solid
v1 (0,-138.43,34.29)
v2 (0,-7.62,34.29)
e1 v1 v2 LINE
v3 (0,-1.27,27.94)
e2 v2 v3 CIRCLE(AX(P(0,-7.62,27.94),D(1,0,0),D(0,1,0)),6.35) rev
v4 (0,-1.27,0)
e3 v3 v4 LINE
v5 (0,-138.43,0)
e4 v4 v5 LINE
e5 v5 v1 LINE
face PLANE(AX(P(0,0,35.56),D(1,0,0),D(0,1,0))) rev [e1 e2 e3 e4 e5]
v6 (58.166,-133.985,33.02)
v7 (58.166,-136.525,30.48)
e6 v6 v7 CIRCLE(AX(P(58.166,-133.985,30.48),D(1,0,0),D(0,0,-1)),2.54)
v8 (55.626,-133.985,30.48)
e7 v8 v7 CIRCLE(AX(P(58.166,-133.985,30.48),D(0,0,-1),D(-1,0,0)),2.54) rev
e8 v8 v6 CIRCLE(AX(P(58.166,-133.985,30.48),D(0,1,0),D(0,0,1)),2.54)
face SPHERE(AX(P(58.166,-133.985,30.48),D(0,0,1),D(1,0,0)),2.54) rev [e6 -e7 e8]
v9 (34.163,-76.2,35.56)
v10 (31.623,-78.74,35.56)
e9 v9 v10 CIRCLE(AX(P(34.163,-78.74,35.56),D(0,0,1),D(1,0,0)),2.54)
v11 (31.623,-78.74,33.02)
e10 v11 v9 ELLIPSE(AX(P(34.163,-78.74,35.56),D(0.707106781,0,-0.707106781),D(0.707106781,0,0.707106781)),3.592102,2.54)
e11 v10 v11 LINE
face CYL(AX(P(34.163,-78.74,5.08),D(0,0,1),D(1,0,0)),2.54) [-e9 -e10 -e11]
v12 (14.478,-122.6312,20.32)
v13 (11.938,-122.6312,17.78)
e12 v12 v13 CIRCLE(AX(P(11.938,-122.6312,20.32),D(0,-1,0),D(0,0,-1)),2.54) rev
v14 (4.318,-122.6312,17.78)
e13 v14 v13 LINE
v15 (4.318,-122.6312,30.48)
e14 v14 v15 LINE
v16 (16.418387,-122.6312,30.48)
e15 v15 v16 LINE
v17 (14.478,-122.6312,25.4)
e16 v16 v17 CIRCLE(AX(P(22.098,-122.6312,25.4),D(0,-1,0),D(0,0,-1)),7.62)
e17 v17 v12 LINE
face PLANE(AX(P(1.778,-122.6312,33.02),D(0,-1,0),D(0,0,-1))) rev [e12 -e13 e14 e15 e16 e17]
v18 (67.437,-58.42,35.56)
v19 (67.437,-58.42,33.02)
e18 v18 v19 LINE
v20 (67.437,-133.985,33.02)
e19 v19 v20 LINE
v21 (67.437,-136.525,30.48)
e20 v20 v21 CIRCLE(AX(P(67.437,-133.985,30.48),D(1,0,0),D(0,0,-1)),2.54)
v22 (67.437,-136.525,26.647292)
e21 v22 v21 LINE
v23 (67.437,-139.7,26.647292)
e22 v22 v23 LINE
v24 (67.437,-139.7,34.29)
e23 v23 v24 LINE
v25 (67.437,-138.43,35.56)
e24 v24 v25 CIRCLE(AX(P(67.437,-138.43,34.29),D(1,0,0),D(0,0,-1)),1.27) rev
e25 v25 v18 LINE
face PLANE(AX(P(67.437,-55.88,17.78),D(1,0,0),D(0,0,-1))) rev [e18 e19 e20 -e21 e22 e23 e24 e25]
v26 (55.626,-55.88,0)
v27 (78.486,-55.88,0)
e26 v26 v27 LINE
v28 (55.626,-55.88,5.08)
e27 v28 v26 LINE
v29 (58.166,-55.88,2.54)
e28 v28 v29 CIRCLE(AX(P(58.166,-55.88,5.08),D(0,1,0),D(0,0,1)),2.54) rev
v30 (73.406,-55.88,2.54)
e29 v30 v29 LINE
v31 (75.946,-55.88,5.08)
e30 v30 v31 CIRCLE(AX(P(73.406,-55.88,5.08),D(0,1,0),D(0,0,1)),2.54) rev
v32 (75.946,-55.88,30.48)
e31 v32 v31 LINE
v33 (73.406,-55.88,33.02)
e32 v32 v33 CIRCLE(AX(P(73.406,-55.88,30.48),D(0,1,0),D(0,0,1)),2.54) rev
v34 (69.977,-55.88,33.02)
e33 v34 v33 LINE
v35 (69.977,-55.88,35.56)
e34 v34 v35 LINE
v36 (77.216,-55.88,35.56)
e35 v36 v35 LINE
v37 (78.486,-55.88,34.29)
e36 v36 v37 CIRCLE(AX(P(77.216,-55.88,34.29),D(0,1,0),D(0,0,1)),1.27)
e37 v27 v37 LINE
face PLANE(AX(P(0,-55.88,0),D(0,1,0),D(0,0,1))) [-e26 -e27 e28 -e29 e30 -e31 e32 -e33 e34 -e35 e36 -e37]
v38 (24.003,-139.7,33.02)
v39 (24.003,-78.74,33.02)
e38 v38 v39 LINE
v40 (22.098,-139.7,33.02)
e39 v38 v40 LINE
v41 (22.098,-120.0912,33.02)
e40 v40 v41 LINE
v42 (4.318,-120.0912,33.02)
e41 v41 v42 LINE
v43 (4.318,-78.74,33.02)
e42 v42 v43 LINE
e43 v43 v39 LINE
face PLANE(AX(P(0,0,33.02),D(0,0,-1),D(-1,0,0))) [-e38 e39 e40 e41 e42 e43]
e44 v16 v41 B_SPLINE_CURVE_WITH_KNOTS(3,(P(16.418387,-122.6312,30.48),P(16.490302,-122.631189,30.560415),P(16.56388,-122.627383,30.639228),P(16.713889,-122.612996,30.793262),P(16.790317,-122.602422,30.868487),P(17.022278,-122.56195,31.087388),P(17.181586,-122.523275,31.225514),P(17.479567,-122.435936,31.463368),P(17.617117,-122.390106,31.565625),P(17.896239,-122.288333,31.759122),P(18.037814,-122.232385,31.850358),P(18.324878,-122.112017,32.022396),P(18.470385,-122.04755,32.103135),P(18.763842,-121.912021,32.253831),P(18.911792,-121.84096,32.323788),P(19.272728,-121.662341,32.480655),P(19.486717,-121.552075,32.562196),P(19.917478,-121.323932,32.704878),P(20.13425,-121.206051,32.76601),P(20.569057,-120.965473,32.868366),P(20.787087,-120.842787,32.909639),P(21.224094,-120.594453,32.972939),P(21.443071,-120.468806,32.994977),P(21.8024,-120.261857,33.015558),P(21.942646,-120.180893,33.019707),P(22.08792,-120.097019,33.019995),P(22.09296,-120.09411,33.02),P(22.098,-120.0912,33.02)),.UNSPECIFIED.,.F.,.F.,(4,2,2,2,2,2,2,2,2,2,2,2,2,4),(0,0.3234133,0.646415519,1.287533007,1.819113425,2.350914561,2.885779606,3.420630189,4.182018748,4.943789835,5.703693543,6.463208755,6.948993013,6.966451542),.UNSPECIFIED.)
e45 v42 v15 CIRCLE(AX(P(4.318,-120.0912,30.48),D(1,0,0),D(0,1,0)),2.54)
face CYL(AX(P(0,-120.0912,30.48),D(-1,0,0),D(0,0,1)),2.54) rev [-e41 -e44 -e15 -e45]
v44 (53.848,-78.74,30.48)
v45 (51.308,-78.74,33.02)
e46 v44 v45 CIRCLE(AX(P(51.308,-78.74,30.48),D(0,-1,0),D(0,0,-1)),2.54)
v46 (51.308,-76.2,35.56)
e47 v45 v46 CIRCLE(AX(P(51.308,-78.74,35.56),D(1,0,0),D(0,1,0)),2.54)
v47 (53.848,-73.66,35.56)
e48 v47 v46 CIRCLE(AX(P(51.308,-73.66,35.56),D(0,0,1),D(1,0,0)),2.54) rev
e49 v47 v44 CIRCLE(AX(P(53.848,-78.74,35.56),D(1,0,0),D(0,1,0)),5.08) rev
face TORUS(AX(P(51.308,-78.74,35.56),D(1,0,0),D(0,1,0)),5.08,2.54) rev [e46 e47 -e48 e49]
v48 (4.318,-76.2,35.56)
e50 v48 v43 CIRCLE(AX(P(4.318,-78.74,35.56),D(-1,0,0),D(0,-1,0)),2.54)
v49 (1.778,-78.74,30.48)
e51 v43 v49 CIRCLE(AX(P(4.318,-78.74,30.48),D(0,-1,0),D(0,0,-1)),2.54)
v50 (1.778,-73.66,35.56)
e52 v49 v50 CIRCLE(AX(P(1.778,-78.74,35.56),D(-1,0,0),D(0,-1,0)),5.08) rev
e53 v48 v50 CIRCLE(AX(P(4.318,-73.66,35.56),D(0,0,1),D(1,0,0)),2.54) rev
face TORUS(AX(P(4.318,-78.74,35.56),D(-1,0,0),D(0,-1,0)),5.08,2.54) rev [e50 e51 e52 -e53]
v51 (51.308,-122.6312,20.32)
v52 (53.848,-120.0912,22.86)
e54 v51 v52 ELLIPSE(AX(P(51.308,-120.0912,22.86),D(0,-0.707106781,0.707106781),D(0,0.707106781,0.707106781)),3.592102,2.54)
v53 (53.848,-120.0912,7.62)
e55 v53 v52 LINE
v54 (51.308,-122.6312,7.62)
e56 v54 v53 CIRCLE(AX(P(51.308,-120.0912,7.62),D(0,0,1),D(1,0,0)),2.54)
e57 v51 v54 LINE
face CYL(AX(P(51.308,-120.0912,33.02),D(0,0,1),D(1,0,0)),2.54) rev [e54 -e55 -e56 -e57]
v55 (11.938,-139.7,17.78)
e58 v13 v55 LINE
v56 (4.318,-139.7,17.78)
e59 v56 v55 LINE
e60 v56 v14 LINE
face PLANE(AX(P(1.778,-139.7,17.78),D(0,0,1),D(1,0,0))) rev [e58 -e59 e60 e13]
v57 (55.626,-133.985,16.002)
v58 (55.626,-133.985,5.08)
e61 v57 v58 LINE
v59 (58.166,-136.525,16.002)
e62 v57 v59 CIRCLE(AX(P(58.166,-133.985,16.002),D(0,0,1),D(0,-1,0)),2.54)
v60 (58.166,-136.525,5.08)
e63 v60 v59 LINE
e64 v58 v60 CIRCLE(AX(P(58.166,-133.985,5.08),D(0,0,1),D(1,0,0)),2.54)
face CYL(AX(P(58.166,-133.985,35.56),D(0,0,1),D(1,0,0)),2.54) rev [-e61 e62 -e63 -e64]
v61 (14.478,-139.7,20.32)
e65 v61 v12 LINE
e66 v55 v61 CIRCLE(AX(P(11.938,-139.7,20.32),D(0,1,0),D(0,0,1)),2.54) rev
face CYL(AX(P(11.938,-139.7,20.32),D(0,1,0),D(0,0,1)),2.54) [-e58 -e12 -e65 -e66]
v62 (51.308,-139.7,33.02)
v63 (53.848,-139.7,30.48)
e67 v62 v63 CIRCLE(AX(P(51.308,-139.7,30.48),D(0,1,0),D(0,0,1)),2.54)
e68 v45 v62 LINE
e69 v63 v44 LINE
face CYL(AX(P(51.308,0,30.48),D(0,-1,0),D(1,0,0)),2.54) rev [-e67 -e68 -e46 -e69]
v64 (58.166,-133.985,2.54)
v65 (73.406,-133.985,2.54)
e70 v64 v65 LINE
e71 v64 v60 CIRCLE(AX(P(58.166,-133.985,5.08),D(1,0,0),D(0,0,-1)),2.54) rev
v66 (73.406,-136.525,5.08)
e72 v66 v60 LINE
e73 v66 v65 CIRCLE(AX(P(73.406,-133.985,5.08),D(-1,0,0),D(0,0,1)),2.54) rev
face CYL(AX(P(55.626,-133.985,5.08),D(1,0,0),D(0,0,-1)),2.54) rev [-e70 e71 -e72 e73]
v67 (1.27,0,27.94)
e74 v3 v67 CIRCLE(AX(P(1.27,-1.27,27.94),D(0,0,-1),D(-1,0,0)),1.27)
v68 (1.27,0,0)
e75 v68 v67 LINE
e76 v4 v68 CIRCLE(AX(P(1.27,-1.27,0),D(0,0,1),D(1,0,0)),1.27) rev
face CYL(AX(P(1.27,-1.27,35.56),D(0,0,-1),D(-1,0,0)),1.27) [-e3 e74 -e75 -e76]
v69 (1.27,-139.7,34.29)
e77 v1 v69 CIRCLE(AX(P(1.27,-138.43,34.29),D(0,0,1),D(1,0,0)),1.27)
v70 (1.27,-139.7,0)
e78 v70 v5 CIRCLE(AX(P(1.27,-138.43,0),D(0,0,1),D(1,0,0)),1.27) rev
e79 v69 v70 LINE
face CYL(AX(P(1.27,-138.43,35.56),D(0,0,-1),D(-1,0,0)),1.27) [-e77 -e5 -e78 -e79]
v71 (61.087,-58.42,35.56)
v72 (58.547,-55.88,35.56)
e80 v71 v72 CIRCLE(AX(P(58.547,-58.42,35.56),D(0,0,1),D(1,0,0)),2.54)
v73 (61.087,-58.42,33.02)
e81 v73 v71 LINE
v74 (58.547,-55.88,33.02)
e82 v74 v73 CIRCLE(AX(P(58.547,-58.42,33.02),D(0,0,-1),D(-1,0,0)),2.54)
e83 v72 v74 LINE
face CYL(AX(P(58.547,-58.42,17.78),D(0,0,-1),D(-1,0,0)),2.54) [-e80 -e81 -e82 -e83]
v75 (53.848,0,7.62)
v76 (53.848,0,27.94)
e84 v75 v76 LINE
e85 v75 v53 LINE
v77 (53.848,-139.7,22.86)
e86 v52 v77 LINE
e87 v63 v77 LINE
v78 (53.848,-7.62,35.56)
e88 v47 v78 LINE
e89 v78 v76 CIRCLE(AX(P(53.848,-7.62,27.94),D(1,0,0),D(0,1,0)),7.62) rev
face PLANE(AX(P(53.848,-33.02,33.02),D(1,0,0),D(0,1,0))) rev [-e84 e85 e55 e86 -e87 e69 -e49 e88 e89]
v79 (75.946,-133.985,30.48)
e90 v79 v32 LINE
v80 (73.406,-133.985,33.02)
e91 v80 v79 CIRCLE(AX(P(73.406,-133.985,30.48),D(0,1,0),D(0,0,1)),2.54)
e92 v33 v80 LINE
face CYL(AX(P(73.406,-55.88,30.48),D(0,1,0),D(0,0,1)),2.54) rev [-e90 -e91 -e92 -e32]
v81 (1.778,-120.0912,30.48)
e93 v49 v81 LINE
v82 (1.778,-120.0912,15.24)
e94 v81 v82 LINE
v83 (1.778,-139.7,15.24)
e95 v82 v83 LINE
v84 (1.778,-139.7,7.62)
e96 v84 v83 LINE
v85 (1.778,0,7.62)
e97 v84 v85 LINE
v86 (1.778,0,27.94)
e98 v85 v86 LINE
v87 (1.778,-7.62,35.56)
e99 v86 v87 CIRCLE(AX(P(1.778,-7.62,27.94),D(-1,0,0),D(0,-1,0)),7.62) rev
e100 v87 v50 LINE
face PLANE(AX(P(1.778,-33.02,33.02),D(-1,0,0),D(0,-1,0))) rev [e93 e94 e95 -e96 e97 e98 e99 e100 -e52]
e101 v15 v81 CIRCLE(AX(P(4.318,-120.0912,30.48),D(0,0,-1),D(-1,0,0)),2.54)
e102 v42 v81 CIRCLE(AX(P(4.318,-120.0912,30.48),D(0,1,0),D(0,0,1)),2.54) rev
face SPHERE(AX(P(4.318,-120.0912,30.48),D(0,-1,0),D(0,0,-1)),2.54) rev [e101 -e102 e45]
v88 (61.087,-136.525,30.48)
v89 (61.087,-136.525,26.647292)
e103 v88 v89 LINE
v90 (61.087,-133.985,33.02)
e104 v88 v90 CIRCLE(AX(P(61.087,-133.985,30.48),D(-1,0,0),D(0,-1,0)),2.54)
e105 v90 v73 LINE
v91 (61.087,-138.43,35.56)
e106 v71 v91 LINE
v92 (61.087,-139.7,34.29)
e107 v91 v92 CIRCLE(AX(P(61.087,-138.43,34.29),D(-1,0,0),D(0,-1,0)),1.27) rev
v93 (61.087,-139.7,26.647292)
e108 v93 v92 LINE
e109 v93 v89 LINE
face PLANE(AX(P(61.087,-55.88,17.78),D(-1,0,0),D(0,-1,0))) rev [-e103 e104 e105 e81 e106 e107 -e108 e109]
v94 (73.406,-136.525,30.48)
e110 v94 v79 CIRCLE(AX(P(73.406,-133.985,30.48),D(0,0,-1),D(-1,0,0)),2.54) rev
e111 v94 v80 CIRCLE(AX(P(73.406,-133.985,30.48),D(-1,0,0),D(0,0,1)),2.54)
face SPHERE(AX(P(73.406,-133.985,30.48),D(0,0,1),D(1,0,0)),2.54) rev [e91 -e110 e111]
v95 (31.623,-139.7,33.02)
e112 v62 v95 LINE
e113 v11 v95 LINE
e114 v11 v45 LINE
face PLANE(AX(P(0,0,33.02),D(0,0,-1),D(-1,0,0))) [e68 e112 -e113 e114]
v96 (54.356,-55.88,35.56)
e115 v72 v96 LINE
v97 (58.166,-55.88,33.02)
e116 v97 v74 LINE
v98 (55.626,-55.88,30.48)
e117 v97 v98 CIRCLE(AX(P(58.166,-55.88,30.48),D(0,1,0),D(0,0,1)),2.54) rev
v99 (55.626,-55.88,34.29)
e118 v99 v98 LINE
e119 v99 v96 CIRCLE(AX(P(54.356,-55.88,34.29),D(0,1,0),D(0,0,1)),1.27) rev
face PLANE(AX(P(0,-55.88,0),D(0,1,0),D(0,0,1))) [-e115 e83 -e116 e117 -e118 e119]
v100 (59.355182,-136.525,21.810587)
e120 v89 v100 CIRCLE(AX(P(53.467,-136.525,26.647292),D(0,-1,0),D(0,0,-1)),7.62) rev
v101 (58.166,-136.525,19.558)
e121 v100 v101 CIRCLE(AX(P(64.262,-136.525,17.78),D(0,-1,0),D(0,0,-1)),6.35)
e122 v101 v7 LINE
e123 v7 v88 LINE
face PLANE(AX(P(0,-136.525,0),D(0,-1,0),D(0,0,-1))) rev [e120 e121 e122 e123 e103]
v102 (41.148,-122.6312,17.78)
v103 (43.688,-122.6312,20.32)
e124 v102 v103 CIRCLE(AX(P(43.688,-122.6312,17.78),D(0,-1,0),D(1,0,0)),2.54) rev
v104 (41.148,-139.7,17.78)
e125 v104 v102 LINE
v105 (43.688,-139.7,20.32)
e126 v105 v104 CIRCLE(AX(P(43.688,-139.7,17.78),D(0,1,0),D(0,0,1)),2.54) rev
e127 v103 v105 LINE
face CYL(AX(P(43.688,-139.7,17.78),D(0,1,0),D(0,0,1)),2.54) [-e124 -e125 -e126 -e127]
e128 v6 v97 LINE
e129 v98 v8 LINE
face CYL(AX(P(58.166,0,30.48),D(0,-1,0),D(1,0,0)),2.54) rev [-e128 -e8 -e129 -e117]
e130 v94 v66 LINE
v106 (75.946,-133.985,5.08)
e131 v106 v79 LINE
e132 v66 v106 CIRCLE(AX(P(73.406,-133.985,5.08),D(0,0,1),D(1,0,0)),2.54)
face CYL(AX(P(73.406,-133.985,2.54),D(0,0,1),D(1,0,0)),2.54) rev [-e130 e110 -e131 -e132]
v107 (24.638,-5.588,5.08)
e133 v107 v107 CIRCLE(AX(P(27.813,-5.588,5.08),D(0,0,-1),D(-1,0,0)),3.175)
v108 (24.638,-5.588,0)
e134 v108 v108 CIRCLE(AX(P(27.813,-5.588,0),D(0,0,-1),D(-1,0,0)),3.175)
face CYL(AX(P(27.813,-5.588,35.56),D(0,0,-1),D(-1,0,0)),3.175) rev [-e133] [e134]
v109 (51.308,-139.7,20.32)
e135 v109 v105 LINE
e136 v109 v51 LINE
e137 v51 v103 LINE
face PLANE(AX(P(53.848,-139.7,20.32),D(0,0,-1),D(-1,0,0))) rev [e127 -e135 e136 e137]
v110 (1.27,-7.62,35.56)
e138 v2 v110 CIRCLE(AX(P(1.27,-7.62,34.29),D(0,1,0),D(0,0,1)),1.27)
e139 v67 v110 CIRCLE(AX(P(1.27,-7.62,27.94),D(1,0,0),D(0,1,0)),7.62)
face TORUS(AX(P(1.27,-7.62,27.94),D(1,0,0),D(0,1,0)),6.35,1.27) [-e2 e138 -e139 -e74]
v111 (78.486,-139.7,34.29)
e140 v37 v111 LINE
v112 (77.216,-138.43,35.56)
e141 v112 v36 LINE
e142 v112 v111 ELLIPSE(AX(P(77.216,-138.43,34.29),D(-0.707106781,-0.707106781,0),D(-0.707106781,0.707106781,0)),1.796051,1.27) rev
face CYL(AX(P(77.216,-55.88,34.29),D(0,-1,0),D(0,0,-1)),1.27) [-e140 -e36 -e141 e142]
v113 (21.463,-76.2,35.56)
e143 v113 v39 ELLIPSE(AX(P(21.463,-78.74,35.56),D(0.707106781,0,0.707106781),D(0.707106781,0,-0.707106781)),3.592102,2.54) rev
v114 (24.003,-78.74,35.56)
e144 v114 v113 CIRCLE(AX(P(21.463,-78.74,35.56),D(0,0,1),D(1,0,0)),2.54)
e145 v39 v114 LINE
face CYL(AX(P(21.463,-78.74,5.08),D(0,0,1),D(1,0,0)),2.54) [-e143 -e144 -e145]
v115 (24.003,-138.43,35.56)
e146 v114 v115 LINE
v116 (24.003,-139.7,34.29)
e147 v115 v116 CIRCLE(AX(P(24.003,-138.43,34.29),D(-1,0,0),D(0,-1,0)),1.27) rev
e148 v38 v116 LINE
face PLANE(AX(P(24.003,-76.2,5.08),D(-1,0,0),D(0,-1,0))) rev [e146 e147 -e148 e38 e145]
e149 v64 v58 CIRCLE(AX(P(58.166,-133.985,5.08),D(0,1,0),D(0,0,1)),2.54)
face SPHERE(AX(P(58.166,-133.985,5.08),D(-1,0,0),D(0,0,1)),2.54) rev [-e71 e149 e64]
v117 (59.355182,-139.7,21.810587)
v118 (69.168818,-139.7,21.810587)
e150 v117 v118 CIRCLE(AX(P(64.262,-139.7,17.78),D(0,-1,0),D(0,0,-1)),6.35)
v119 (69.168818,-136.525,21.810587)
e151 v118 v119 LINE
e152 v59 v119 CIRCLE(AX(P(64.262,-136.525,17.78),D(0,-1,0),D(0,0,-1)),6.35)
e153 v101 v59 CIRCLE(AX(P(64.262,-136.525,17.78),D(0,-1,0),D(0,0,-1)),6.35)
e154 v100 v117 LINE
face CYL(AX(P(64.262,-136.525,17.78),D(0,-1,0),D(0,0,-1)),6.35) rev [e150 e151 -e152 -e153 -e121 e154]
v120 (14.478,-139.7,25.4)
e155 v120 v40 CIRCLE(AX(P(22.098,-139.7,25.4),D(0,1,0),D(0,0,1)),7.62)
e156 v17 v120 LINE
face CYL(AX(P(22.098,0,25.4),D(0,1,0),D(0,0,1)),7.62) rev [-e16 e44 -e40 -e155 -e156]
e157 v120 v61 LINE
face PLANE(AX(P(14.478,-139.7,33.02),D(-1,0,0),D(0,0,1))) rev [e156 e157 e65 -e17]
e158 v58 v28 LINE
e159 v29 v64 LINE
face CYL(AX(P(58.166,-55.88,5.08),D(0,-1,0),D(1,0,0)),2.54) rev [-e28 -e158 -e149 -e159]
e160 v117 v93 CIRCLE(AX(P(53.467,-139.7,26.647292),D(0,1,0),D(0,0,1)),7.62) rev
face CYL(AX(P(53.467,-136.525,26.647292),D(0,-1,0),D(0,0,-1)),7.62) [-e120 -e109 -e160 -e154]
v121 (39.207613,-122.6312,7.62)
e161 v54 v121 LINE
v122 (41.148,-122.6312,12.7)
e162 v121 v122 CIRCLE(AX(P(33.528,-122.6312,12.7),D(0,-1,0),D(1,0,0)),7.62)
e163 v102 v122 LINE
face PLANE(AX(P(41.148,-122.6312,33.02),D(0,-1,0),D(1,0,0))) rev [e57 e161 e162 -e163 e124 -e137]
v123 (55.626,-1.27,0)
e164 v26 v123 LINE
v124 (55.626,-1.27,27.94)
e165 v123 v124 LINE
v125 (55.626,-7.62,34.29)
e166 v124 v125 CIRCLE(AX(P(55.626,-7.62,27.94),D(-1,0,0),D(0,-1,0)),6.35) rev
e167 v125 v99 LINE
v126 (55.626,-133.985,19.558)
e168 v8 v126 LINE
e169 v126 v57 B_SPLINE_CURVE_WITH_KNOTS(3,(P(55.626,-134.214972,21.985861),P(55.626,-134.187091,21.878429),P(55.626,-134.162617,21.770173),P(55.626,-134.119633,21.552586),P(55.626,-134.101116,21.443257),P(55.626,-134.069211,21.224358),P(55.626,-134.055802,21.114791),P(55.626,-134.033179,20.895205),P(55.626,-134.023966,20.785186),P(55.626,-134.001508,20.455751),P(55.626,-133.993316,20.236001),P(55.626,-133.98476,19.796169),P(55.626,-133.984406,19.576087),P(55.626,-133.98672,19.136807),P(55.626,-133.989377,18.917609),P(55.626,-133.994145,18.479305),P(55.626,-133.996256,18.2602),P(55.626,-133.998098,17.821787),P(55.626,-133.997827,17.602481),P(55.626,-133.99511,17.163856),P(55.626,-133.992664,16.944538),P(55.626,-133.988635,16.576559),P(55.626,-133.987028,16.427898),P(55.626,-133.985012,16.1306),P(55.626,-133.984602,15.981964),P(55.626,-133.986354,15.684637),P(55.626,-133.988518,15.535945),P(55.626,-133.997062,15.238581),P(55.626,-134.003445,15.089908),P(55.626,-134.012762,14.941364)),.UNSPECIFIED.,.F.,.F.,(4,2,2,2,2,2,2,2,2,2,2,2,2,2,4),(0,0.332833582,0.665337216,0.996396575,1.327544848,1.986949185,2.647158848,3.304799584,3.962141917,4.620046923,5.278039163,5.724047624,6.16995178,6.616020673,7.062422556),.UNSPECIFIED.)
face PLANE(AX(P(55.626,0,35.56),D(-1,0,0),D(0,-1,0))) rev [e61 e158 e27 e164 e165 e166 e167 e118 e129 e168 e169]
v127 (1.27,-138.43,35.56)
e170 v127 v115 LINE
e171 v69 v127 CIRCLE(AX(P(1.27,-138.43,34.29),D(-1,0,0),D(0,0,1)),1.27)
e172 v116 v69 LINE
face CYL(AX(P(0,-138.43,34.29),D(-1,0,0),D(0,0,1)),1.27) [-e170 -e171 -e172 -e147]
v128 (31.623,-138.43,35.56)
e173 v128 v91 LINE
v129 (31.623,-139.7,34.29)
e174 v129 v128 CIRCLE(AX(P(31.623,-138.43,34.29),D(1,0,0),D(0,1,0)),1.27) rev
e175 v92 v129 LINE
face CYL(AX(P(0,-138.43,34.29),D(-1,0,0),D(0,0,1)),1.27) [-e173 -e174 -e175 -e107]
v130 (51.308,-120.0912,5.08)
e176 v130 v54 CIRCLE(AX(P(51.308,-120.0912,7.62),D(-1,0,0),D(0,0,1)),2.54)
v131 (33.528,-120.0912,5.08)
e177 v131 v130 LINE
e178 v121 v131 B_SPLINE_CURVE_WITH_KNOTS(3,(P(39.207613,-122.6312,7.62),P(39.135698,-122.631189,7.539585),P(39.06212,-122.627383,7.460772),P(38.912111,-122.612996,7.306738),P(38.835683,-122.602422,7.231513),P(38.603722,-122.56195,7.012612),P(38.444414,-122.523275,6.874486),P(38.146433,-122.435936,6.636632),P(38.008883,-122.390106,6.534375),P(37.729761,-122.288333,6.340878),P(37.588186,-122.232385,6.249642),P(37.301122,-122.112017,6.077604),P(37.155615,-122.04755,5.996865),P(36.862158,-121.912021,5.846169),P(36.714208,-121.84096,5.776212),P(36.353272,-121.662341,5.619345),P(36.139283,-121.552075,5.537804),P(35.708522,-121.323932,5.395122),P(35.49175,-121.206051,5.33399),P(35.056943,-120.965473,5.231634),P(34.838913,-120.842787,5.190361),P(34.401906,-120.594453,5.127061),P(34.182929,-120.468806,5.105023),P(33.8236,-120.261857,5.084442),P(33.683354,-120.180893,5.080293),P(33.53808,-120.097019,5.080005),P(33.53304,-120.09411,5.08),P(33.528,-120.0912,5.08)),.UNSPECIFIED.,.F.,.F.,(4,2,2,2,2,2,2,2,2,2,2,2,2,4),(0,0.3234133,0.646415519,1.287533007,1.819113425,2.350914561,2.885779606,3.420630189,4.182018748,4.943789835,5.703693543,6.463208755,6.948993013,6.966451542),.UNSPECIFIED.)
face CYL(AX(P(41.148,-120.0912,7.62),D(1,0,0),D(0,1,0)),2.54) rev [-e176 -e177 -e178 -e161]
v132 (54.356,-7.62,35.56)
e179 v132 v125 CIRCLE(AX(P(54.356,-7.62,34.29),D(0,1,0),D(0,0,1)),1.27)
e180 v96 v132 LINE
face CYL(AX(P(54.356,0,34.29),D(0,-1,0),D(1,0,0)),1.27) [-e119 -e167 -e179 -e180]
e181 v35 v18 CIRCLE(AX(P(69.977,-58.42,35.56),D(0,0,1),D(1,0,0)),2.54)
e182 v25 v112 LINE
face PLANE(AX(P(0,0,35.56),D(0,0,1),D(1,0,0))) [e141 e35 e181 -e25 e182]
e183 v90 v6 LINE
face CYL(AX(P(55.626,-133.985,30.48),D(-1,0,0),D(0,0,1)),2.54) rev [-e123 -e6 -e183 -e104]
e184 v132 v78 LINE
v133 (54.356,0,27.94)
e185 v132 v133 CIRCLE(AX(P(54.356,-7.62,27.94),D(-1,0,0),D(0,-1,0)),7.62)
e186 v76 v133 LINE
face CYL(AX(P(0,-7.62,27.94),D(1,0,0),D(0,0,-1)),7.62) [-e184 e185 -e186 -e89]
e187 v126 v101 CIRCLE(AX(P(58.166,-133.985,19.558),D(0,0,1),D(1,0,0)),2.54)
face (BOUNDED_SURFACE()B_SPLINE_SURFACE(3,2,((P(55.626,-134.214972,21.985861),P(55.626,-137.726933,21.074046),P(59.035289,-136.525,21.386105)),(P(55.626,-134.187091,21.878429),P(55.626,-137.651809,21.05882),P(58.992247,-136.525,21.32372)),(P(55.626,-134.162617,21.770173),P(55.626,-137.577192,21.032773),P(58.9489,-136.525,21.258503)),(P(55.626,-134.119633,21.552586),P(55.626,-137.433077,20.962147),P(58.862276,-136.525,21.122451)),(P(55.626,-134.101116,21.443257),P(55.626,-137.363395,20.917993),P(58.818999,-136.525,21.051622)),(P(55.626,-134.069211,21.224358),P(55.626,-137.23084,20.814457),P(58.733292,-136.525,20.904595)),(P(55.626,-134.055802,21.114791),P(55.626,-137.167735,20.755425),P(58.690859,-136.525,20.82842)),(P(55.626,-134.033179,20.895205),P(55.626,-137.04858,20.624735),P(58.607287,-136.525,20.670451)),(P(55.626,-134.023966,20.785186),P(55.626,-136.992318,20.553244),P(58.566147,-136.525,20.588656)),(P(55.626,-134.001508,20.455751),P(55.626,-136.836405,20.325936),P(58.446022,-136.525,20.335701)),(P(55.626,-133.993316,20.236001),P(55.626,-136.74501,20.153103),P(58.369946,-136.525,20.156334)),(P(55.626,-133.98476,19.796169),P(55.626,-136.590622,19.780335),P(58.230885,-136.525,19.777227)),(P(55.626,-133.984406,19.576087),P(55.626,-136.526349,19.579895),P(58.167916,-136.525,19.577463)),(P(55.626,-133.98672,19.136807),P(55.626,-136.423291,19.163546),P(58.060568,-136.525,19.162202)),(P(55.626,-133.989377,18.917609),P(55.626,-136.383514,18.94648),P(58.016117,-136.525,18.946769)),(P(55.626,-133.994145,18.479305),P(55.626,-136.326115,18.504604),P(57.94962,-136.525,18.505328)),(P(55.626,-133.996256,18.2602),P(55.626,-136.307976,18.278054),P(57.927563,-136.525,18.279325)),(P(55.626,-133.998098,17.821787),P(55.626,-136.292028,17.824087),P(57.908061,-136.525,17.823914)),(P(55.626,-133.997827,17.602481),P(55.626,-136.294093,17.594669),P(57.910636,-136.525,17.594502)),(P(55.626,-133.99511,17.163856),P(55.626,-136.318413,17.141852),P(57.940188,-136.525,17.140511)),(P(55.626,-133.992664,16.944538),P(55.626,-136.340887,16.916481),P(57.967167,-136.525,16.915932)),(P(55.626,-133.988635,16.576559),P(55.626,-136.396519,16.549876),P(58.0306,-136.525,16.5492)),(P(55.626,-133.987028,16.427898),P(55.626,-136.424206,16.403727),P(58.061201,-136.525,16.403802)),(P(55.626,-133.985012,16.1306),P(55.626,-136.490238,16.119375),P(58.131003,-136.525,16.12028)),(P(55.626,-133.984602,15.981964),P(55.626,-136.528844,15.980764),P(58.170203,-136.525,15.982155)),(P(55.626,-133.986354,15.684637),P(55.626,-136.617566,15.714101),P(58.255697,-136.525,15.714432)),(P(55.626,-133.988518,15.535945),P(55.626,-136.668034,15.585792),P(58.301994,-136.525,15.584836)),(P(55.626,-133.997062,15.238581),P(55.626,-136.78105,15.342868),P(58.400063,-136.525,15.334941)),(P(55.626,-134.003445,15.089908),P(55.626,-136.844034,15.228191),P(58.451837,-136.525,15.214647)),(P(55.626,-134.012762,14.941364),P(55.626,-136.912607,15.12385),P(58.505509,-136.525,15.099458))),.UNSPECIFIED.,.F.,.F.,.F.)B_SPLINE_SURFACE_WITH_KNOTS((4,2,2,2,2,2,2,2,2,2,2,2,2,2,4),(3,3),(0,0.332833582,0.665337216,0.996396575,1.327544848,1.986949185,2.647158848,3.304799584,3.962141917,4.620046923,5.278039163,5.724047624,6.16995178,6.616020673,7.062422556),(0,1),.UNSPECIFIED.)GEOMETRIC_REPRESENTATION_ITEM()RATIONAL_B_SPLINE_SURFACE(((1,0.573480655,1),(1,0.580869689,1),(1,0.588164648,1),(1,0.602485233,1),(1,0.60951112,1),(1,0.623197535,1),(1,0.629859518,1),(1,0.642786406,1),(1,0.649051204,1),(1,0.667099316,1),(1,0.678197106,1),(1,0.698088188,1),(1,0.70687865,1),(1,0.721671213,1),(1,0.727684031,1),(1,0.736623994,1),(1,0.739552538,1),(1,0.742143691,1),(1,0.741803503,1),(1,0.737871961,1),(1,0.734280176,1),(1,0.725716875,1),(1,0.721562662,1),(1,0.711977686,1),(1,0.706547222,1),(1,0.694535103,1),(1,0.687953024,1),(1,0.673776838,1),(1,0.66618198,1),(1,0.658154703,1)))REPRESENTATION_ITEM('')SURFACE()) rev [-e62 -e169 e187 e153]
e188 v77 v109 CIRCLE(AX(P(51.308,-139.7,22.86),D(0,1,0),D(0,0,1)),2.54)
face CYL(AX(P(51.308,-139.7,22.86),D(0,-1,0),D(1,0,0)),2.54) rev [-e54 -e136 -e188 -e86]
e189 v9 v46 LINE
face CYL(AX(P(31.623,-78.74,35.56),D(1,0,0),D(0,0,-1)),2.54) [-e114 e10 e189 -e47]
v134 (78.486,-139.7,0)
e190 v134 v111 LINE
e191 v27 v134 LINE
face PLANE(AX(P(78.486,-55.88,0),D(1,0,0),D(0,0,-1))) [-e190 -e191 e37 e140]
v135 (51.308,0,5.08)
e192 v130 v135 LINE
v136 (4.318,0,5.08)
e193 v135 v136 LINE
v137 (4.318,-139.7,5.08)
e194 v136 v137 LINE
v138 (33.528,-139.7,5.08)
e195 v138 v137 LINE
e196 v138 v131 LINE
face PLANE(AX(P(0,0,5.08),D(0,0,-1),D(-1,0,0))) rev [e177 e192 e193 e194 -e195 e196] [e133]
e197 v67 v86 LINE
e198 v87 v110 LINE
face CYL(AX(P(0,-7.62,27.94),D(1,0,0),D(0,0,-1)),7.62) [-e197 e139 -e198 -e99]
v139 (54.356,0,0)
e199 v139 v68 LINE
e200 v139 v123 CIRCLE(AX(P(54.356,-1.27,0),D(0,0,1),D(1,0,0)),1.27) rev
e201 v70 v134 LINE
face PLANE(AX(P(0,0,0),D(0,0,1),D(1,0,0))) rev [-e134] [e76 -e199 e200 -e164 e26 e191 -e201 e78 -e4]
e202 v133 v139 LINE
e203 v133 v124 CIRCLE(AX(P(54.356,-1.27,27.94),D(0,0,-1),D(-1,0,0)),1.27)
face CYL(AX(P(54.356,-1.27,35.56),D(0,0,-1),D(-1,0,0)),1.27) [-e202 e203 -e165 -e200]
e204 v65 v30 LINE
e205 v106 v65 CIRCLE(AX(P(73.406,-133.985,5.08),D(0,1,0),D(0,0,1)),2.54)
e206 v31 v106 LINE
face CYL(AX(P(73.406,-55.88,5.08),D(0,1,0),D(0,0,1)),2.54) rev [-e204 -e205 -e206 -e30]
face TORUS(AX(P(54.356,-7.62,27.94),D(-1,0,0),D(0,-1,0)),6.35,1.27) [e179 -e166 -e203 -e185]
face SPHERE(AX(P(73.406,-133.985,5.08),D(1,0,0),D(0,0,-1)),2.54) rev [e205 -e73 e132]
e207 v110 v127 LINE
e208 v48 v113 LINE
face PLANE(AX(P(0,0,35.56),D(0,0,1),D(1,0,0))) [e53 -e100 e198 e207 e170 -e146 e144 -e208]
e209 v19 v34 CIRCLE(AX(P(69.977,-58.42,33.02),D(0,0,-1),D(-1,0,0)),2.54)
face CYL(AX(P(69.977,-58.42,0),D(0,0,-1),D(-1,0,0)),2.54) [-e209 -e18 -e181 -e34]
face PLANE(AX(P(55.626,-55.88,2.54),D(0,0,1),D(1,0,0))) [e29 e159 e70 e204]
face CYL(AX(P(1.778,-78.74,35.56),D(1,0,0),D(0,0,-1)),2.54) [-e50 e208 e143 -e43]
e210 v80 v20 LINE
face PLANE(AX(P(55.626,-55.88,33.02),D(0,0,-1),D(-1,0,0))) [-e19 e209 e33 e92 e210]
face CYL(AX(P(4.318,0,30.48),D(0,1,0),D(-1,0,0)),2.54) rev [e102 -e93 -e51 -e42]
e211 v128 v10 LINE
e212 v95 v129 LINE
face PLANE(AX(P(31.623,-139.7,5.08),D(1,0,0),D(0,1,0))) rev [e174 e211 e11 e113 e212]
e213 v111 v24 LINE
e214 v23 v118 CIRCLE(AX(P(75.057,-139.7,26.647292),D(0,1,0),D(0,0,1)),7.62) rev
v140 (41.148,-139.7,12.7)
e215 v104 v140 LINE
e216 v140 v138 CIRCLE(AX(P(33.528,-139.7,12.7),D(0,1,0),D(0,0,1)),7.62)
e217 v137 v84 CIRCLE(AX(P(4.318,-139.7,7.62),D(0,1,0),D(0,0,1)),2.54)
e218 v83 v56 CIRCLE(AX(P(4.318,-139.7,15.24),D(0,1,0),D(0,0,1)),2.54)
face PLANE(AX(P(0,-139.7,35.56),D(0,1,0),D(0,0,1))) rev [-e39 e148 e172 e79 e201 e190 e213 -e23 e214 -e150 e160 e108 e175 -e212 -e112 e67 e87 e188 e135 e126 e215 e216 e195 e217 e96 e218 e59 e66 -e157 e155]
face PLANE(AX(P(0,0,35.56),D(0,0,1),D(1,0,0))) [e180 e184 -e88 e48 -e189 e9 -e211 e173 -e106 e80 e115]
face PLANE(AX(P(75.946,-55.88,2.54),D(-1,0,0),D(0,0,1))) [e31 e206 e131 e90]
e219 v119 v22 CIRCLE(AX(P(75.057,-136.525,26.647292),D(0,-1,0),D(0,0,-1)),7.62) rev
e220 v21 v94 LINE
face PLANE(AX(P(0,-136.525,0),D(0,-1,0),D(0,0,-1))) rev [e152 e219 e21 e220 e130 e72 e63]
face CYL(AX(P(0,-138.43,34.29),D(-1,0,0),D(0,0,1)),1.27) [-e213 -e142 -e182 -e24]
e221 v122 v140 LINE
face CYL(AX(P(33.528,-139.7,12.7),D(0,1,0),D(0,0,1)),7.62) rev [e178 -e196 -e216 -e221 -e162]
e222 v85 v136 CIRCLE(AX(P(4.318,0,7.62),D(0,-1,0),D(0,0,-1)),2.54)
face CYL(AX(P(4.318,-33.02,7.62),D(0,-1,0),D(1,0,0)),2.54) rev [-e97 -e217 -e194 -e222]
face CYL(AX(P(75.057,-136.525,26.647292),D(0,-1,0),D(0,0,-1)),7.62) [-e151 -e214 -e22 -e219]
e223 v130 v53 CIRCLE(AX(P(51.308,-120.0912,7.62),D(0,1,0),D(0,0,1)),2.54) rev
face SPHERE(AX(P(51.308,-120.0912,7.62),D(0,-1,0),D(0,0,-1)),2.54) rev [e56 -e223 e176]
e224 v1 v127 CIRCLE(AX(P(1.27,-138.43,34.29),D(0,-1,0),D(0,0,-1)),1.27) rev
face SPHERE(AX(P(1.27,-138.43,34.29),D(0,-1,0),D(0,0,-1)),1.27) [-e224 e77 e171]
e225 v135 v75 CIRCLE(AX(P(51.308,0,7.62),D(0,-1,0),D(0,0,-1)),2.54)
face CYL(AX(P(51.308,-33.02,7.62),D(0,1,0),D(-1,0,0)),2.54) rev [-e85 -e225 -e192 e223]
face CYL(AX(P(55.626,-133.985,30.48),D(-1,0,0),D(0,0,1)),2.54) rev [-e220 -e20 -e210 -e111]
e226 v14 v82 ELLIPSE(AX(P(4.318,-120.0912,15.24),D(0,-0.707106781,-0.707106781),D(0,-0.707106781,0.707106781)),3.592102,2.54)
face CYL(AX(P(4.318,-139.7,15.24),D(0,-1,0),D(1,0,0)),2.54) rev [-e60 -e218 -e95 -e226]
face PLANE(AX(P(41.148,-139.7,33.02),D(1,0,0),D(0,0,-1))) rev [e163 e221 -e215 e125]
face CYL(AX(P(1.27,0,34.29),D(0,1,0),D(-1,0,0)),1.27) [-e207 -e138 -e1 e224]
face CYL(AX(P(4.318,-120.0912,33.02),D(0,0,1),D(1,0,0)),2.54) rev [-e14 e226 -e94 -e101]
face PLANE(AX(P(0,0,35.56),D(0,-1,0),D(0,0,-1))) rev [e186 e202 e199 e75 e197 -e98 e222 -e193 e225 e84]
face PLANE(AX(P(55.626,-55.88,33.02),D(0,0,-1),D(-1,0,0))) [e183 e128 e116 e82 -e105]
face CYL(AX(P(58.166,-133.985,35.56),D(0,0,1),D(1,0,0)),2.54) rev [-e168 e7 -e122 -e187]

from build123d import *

# Parameters (mm, degrees)
SKETCH1_W           = 55.626
SKETCH1_H           = 139.7
BOSS_EXTRUDE1_DEPTH = 35.56
CUT_EXTRUDE1_DEPTH  = 27.94
CUT_EXTRUDE6_DEPTH  = 30.48
SKETCH4_R           = 3.175
CUT_EXTRUDE7_DEPTH  = 155.514903734
SKETCH5_W           = 12.7
SKETCH5_H           = 12.7
CUT_EXTRUDE8_DEPTH  = 140.273747309
BOSS_EXTRUDE2_DEPTH = 83.82
SKETCH7_W           = 20.32
SKETCH7_H           = 30.48
SKETCH7_R           = 6.35
BOSS_EXTRUDE3_DEPTH = 3.175
SKETCH8_W           = 6.35
SKETCH8_H           = 83.82
CUT_EXTRUDE9_DEPTH  = 17.78
FILLET1_R           = 7.62
FILLET2_R           = 2.54
FILLET3_R           = 1.27


with BuildPart() as part:
    # Sketch1 → Boss-Extrude1 (new body)
    with BuildSketch(Plane.XY):
        with Locations((27.813, -69.85)):
            Rectangle(SKETCH1_W, SKETCH1_H)
    extrude(amount=BOSS_EXTRUDE1_DEPTH)

    # Sketch2 → Cut-Extrude1 (cut)
    with BuildSketch(Plane(origin=(0, 0, 5.08), x_dir=(-1, 0, 0), z_dir=(0, 0, -1))):
        Polygon((-1.778, -33.02), (-53.848, -33.02), (-53.848, -122.6312), (-41.148, -122.6312), (-41.148, -139.7), (-14.478, -139.7), (-14.478, -122.6312), (-1.778, -122.6312), align=None)
    extrude(amount=-CUT_EXTRUDE1_DEPTH, mode=Mode.SUBTRACT)

    # Sketch3 → Cut-Extrude6 (cut)
    with BuildSketch(Plane.XY.offset(35.56)):
        Polygon((24.003, -139.7), (31.623, -139.7), (31.623, -76.2), (53.848, -76.2), (53.848, 0), (1.778, 0), (1.778, -76.2), (24.003, -76.2), align=None)
    extrude(amount=-CUT_EXTRUDE6_DEPTH, mode=Mode.SUBTRACT)

    # Sketch4 → Cut-Extrude7 (cut, through all)
    with BuildSketch(Plane(origin=(0, 0, 0), x_dir=(-1, 0, 0), z_dir=(0, 0, -1))):
        with Locations((-27.813, -5.588)):
            Circle(SKETCH4_R)
    extrude(amount=-CUT_EXTRUDE7_DEPTH, mode=Mode.SUBTRACT)

    # Sketch5 → Cut-Extrude8 (cut, through all)
    with BuildSketch(Plane(origin=(0, -122.6312, 0), x_dir=(1, 0, 0), z_dir=(0, 1, 0))):
        with Locations((8.128, -11.43)):
            Rectangle(SKETCH5_W, SKETCH5_H)
        with Locations((47.498, -26.67)):
            Rectangle(SKETCH5_W, SKETCH5_H)
    extrude(amount=-CUT_EXTRUDE8_DEPTH, mode=Mode.SUBTRACT)

    # Sketch6 → Boss-Extrude2 (add)
    with BuildSketch(Plane.XZ.offset(139.7)):
        Polygon((55.626, 0), (78.486, 0), (78.486, 35.56), (55.626, 35.56), (55.626, 33.02), (75.946, 33.02), (75.946, 2.54), (55.626, 2.54), align=None)
    extrude(amount=-BOSS_EXTRUDE2_DEPTH)

    # Sketch7 → Boss-Extrude3 (add)
    with BuildSketch(Plane.XZ.offset(139.7)):
        with Locations((65.786, 17.78)):
            Rectangle(SKETCH7_W, SKETCH7_H)
        with Locations(Location((64.262, 17.78, 0), (0, 0, 270))):
            Circle(SKETCH7_R, mode=Mode.SUBTRACT)
    extrude(amount=-BOSS_EXTRUDE3_DEPTH)

    # Sketch8 → Cut-Extrude9 (cut)
    with BuildSketch(Plane.XY.offset(35.56)):
        with Locations((64.262, -97.79)):
            Rectangle(SKETCH8_W, SKETCH8_H)
    extrude(amount=-CUT_EXTRUDE9_DEPTH, mode=Mode.SUBTRACT)

    # Fillet1
    fillet1_edges = [part.edges().sort_by_distance(p)[0] for p in [
        (67.437, -138.1125, 23.279261314),
        (61.087, -138.1125, 23.279261314),
        (54.737, 0, 35.56),
        (14.478, -131.1656, 33.02),
        (41.148, -131.1656, 5.08),
        (0.889, 0, 35.56),
    ]]
    fillet(fillet1_edges, radius=FILLET1_R)

    # Fillet2
    fillet2_edges = [part.edges().sort_by_distance(p)[0] for p in [
        (53.848, -131.1656, 20.32),
        (41.148, -131.1656, 20.32),
        (55.626, -96.2025, 2.54),
        (75.946, -96.2025, 2.54),
        (75.946, -96.2025, 33.02),
        (55.626, -96.2025, 33.02),
        (55.626, -136.525, 17.78),
        (71.6915, -136.525, 33.02),
        (75.946, -136.525, 17.78),
        (65.786, -136.525, 2.54),
        (58.3565, -136.525, 33.02),
        (61.087, -55.88, 34.29),
        (67.437, -55.88, 34.29),
        (1.778, -99.4156, 33.02),
        (11.938, -122.6312, 33.02),
        (1.778, -122.6312, 25.4),
        (43.688, -122.6312, 5.08),
        (1.778, -69.85, 5.08),
        (53.848, -61.3156, 5.08),
        (53.848, -107.95, 33.02),
        (12.8905, -76.2, 33.02),
        (1.778, -76.2, 34.29),
        (42.7355, -76.2, 33.02),
        (24.003, -76.2, 34.29),
        (53.848, -76.2, 34.29),
        (31.623, -76.2, 34.29),
        (53.848, -122.6312, 12.7),
        (1.778, -131.1656, 17.78),
        (14.478, -131.1656, 17.78),
    ]]
    fillet(fillet2_edges, radius=FILLET2_R - 0.0001)  # a hair under: the kernel refuses the full size

    # Fillet3
    fillet3_edges = [part.edges().sort_by_distance(p)[0] for p in [
        (55.626, -31.75, 35.56),
        (78.486, -97.79, 35.56),
        (72.9615, -139.7, 35.56),
        (55.626, 0, 13.97),
        (0, 0, 13.97),
        (55.626, -2.231846327, 33.328153673),
        (0, -73.66, 35.56),
        (0, -2.231846327, 33.328153673),
        (46.355, -139.7, 35.56),
        (0, -139.7, 17.78),
        (12.0015, -139.7, 35.56),
    ]]
    fillet(fillet3_edges, radius=FILLET3_R)


solid = part.part
